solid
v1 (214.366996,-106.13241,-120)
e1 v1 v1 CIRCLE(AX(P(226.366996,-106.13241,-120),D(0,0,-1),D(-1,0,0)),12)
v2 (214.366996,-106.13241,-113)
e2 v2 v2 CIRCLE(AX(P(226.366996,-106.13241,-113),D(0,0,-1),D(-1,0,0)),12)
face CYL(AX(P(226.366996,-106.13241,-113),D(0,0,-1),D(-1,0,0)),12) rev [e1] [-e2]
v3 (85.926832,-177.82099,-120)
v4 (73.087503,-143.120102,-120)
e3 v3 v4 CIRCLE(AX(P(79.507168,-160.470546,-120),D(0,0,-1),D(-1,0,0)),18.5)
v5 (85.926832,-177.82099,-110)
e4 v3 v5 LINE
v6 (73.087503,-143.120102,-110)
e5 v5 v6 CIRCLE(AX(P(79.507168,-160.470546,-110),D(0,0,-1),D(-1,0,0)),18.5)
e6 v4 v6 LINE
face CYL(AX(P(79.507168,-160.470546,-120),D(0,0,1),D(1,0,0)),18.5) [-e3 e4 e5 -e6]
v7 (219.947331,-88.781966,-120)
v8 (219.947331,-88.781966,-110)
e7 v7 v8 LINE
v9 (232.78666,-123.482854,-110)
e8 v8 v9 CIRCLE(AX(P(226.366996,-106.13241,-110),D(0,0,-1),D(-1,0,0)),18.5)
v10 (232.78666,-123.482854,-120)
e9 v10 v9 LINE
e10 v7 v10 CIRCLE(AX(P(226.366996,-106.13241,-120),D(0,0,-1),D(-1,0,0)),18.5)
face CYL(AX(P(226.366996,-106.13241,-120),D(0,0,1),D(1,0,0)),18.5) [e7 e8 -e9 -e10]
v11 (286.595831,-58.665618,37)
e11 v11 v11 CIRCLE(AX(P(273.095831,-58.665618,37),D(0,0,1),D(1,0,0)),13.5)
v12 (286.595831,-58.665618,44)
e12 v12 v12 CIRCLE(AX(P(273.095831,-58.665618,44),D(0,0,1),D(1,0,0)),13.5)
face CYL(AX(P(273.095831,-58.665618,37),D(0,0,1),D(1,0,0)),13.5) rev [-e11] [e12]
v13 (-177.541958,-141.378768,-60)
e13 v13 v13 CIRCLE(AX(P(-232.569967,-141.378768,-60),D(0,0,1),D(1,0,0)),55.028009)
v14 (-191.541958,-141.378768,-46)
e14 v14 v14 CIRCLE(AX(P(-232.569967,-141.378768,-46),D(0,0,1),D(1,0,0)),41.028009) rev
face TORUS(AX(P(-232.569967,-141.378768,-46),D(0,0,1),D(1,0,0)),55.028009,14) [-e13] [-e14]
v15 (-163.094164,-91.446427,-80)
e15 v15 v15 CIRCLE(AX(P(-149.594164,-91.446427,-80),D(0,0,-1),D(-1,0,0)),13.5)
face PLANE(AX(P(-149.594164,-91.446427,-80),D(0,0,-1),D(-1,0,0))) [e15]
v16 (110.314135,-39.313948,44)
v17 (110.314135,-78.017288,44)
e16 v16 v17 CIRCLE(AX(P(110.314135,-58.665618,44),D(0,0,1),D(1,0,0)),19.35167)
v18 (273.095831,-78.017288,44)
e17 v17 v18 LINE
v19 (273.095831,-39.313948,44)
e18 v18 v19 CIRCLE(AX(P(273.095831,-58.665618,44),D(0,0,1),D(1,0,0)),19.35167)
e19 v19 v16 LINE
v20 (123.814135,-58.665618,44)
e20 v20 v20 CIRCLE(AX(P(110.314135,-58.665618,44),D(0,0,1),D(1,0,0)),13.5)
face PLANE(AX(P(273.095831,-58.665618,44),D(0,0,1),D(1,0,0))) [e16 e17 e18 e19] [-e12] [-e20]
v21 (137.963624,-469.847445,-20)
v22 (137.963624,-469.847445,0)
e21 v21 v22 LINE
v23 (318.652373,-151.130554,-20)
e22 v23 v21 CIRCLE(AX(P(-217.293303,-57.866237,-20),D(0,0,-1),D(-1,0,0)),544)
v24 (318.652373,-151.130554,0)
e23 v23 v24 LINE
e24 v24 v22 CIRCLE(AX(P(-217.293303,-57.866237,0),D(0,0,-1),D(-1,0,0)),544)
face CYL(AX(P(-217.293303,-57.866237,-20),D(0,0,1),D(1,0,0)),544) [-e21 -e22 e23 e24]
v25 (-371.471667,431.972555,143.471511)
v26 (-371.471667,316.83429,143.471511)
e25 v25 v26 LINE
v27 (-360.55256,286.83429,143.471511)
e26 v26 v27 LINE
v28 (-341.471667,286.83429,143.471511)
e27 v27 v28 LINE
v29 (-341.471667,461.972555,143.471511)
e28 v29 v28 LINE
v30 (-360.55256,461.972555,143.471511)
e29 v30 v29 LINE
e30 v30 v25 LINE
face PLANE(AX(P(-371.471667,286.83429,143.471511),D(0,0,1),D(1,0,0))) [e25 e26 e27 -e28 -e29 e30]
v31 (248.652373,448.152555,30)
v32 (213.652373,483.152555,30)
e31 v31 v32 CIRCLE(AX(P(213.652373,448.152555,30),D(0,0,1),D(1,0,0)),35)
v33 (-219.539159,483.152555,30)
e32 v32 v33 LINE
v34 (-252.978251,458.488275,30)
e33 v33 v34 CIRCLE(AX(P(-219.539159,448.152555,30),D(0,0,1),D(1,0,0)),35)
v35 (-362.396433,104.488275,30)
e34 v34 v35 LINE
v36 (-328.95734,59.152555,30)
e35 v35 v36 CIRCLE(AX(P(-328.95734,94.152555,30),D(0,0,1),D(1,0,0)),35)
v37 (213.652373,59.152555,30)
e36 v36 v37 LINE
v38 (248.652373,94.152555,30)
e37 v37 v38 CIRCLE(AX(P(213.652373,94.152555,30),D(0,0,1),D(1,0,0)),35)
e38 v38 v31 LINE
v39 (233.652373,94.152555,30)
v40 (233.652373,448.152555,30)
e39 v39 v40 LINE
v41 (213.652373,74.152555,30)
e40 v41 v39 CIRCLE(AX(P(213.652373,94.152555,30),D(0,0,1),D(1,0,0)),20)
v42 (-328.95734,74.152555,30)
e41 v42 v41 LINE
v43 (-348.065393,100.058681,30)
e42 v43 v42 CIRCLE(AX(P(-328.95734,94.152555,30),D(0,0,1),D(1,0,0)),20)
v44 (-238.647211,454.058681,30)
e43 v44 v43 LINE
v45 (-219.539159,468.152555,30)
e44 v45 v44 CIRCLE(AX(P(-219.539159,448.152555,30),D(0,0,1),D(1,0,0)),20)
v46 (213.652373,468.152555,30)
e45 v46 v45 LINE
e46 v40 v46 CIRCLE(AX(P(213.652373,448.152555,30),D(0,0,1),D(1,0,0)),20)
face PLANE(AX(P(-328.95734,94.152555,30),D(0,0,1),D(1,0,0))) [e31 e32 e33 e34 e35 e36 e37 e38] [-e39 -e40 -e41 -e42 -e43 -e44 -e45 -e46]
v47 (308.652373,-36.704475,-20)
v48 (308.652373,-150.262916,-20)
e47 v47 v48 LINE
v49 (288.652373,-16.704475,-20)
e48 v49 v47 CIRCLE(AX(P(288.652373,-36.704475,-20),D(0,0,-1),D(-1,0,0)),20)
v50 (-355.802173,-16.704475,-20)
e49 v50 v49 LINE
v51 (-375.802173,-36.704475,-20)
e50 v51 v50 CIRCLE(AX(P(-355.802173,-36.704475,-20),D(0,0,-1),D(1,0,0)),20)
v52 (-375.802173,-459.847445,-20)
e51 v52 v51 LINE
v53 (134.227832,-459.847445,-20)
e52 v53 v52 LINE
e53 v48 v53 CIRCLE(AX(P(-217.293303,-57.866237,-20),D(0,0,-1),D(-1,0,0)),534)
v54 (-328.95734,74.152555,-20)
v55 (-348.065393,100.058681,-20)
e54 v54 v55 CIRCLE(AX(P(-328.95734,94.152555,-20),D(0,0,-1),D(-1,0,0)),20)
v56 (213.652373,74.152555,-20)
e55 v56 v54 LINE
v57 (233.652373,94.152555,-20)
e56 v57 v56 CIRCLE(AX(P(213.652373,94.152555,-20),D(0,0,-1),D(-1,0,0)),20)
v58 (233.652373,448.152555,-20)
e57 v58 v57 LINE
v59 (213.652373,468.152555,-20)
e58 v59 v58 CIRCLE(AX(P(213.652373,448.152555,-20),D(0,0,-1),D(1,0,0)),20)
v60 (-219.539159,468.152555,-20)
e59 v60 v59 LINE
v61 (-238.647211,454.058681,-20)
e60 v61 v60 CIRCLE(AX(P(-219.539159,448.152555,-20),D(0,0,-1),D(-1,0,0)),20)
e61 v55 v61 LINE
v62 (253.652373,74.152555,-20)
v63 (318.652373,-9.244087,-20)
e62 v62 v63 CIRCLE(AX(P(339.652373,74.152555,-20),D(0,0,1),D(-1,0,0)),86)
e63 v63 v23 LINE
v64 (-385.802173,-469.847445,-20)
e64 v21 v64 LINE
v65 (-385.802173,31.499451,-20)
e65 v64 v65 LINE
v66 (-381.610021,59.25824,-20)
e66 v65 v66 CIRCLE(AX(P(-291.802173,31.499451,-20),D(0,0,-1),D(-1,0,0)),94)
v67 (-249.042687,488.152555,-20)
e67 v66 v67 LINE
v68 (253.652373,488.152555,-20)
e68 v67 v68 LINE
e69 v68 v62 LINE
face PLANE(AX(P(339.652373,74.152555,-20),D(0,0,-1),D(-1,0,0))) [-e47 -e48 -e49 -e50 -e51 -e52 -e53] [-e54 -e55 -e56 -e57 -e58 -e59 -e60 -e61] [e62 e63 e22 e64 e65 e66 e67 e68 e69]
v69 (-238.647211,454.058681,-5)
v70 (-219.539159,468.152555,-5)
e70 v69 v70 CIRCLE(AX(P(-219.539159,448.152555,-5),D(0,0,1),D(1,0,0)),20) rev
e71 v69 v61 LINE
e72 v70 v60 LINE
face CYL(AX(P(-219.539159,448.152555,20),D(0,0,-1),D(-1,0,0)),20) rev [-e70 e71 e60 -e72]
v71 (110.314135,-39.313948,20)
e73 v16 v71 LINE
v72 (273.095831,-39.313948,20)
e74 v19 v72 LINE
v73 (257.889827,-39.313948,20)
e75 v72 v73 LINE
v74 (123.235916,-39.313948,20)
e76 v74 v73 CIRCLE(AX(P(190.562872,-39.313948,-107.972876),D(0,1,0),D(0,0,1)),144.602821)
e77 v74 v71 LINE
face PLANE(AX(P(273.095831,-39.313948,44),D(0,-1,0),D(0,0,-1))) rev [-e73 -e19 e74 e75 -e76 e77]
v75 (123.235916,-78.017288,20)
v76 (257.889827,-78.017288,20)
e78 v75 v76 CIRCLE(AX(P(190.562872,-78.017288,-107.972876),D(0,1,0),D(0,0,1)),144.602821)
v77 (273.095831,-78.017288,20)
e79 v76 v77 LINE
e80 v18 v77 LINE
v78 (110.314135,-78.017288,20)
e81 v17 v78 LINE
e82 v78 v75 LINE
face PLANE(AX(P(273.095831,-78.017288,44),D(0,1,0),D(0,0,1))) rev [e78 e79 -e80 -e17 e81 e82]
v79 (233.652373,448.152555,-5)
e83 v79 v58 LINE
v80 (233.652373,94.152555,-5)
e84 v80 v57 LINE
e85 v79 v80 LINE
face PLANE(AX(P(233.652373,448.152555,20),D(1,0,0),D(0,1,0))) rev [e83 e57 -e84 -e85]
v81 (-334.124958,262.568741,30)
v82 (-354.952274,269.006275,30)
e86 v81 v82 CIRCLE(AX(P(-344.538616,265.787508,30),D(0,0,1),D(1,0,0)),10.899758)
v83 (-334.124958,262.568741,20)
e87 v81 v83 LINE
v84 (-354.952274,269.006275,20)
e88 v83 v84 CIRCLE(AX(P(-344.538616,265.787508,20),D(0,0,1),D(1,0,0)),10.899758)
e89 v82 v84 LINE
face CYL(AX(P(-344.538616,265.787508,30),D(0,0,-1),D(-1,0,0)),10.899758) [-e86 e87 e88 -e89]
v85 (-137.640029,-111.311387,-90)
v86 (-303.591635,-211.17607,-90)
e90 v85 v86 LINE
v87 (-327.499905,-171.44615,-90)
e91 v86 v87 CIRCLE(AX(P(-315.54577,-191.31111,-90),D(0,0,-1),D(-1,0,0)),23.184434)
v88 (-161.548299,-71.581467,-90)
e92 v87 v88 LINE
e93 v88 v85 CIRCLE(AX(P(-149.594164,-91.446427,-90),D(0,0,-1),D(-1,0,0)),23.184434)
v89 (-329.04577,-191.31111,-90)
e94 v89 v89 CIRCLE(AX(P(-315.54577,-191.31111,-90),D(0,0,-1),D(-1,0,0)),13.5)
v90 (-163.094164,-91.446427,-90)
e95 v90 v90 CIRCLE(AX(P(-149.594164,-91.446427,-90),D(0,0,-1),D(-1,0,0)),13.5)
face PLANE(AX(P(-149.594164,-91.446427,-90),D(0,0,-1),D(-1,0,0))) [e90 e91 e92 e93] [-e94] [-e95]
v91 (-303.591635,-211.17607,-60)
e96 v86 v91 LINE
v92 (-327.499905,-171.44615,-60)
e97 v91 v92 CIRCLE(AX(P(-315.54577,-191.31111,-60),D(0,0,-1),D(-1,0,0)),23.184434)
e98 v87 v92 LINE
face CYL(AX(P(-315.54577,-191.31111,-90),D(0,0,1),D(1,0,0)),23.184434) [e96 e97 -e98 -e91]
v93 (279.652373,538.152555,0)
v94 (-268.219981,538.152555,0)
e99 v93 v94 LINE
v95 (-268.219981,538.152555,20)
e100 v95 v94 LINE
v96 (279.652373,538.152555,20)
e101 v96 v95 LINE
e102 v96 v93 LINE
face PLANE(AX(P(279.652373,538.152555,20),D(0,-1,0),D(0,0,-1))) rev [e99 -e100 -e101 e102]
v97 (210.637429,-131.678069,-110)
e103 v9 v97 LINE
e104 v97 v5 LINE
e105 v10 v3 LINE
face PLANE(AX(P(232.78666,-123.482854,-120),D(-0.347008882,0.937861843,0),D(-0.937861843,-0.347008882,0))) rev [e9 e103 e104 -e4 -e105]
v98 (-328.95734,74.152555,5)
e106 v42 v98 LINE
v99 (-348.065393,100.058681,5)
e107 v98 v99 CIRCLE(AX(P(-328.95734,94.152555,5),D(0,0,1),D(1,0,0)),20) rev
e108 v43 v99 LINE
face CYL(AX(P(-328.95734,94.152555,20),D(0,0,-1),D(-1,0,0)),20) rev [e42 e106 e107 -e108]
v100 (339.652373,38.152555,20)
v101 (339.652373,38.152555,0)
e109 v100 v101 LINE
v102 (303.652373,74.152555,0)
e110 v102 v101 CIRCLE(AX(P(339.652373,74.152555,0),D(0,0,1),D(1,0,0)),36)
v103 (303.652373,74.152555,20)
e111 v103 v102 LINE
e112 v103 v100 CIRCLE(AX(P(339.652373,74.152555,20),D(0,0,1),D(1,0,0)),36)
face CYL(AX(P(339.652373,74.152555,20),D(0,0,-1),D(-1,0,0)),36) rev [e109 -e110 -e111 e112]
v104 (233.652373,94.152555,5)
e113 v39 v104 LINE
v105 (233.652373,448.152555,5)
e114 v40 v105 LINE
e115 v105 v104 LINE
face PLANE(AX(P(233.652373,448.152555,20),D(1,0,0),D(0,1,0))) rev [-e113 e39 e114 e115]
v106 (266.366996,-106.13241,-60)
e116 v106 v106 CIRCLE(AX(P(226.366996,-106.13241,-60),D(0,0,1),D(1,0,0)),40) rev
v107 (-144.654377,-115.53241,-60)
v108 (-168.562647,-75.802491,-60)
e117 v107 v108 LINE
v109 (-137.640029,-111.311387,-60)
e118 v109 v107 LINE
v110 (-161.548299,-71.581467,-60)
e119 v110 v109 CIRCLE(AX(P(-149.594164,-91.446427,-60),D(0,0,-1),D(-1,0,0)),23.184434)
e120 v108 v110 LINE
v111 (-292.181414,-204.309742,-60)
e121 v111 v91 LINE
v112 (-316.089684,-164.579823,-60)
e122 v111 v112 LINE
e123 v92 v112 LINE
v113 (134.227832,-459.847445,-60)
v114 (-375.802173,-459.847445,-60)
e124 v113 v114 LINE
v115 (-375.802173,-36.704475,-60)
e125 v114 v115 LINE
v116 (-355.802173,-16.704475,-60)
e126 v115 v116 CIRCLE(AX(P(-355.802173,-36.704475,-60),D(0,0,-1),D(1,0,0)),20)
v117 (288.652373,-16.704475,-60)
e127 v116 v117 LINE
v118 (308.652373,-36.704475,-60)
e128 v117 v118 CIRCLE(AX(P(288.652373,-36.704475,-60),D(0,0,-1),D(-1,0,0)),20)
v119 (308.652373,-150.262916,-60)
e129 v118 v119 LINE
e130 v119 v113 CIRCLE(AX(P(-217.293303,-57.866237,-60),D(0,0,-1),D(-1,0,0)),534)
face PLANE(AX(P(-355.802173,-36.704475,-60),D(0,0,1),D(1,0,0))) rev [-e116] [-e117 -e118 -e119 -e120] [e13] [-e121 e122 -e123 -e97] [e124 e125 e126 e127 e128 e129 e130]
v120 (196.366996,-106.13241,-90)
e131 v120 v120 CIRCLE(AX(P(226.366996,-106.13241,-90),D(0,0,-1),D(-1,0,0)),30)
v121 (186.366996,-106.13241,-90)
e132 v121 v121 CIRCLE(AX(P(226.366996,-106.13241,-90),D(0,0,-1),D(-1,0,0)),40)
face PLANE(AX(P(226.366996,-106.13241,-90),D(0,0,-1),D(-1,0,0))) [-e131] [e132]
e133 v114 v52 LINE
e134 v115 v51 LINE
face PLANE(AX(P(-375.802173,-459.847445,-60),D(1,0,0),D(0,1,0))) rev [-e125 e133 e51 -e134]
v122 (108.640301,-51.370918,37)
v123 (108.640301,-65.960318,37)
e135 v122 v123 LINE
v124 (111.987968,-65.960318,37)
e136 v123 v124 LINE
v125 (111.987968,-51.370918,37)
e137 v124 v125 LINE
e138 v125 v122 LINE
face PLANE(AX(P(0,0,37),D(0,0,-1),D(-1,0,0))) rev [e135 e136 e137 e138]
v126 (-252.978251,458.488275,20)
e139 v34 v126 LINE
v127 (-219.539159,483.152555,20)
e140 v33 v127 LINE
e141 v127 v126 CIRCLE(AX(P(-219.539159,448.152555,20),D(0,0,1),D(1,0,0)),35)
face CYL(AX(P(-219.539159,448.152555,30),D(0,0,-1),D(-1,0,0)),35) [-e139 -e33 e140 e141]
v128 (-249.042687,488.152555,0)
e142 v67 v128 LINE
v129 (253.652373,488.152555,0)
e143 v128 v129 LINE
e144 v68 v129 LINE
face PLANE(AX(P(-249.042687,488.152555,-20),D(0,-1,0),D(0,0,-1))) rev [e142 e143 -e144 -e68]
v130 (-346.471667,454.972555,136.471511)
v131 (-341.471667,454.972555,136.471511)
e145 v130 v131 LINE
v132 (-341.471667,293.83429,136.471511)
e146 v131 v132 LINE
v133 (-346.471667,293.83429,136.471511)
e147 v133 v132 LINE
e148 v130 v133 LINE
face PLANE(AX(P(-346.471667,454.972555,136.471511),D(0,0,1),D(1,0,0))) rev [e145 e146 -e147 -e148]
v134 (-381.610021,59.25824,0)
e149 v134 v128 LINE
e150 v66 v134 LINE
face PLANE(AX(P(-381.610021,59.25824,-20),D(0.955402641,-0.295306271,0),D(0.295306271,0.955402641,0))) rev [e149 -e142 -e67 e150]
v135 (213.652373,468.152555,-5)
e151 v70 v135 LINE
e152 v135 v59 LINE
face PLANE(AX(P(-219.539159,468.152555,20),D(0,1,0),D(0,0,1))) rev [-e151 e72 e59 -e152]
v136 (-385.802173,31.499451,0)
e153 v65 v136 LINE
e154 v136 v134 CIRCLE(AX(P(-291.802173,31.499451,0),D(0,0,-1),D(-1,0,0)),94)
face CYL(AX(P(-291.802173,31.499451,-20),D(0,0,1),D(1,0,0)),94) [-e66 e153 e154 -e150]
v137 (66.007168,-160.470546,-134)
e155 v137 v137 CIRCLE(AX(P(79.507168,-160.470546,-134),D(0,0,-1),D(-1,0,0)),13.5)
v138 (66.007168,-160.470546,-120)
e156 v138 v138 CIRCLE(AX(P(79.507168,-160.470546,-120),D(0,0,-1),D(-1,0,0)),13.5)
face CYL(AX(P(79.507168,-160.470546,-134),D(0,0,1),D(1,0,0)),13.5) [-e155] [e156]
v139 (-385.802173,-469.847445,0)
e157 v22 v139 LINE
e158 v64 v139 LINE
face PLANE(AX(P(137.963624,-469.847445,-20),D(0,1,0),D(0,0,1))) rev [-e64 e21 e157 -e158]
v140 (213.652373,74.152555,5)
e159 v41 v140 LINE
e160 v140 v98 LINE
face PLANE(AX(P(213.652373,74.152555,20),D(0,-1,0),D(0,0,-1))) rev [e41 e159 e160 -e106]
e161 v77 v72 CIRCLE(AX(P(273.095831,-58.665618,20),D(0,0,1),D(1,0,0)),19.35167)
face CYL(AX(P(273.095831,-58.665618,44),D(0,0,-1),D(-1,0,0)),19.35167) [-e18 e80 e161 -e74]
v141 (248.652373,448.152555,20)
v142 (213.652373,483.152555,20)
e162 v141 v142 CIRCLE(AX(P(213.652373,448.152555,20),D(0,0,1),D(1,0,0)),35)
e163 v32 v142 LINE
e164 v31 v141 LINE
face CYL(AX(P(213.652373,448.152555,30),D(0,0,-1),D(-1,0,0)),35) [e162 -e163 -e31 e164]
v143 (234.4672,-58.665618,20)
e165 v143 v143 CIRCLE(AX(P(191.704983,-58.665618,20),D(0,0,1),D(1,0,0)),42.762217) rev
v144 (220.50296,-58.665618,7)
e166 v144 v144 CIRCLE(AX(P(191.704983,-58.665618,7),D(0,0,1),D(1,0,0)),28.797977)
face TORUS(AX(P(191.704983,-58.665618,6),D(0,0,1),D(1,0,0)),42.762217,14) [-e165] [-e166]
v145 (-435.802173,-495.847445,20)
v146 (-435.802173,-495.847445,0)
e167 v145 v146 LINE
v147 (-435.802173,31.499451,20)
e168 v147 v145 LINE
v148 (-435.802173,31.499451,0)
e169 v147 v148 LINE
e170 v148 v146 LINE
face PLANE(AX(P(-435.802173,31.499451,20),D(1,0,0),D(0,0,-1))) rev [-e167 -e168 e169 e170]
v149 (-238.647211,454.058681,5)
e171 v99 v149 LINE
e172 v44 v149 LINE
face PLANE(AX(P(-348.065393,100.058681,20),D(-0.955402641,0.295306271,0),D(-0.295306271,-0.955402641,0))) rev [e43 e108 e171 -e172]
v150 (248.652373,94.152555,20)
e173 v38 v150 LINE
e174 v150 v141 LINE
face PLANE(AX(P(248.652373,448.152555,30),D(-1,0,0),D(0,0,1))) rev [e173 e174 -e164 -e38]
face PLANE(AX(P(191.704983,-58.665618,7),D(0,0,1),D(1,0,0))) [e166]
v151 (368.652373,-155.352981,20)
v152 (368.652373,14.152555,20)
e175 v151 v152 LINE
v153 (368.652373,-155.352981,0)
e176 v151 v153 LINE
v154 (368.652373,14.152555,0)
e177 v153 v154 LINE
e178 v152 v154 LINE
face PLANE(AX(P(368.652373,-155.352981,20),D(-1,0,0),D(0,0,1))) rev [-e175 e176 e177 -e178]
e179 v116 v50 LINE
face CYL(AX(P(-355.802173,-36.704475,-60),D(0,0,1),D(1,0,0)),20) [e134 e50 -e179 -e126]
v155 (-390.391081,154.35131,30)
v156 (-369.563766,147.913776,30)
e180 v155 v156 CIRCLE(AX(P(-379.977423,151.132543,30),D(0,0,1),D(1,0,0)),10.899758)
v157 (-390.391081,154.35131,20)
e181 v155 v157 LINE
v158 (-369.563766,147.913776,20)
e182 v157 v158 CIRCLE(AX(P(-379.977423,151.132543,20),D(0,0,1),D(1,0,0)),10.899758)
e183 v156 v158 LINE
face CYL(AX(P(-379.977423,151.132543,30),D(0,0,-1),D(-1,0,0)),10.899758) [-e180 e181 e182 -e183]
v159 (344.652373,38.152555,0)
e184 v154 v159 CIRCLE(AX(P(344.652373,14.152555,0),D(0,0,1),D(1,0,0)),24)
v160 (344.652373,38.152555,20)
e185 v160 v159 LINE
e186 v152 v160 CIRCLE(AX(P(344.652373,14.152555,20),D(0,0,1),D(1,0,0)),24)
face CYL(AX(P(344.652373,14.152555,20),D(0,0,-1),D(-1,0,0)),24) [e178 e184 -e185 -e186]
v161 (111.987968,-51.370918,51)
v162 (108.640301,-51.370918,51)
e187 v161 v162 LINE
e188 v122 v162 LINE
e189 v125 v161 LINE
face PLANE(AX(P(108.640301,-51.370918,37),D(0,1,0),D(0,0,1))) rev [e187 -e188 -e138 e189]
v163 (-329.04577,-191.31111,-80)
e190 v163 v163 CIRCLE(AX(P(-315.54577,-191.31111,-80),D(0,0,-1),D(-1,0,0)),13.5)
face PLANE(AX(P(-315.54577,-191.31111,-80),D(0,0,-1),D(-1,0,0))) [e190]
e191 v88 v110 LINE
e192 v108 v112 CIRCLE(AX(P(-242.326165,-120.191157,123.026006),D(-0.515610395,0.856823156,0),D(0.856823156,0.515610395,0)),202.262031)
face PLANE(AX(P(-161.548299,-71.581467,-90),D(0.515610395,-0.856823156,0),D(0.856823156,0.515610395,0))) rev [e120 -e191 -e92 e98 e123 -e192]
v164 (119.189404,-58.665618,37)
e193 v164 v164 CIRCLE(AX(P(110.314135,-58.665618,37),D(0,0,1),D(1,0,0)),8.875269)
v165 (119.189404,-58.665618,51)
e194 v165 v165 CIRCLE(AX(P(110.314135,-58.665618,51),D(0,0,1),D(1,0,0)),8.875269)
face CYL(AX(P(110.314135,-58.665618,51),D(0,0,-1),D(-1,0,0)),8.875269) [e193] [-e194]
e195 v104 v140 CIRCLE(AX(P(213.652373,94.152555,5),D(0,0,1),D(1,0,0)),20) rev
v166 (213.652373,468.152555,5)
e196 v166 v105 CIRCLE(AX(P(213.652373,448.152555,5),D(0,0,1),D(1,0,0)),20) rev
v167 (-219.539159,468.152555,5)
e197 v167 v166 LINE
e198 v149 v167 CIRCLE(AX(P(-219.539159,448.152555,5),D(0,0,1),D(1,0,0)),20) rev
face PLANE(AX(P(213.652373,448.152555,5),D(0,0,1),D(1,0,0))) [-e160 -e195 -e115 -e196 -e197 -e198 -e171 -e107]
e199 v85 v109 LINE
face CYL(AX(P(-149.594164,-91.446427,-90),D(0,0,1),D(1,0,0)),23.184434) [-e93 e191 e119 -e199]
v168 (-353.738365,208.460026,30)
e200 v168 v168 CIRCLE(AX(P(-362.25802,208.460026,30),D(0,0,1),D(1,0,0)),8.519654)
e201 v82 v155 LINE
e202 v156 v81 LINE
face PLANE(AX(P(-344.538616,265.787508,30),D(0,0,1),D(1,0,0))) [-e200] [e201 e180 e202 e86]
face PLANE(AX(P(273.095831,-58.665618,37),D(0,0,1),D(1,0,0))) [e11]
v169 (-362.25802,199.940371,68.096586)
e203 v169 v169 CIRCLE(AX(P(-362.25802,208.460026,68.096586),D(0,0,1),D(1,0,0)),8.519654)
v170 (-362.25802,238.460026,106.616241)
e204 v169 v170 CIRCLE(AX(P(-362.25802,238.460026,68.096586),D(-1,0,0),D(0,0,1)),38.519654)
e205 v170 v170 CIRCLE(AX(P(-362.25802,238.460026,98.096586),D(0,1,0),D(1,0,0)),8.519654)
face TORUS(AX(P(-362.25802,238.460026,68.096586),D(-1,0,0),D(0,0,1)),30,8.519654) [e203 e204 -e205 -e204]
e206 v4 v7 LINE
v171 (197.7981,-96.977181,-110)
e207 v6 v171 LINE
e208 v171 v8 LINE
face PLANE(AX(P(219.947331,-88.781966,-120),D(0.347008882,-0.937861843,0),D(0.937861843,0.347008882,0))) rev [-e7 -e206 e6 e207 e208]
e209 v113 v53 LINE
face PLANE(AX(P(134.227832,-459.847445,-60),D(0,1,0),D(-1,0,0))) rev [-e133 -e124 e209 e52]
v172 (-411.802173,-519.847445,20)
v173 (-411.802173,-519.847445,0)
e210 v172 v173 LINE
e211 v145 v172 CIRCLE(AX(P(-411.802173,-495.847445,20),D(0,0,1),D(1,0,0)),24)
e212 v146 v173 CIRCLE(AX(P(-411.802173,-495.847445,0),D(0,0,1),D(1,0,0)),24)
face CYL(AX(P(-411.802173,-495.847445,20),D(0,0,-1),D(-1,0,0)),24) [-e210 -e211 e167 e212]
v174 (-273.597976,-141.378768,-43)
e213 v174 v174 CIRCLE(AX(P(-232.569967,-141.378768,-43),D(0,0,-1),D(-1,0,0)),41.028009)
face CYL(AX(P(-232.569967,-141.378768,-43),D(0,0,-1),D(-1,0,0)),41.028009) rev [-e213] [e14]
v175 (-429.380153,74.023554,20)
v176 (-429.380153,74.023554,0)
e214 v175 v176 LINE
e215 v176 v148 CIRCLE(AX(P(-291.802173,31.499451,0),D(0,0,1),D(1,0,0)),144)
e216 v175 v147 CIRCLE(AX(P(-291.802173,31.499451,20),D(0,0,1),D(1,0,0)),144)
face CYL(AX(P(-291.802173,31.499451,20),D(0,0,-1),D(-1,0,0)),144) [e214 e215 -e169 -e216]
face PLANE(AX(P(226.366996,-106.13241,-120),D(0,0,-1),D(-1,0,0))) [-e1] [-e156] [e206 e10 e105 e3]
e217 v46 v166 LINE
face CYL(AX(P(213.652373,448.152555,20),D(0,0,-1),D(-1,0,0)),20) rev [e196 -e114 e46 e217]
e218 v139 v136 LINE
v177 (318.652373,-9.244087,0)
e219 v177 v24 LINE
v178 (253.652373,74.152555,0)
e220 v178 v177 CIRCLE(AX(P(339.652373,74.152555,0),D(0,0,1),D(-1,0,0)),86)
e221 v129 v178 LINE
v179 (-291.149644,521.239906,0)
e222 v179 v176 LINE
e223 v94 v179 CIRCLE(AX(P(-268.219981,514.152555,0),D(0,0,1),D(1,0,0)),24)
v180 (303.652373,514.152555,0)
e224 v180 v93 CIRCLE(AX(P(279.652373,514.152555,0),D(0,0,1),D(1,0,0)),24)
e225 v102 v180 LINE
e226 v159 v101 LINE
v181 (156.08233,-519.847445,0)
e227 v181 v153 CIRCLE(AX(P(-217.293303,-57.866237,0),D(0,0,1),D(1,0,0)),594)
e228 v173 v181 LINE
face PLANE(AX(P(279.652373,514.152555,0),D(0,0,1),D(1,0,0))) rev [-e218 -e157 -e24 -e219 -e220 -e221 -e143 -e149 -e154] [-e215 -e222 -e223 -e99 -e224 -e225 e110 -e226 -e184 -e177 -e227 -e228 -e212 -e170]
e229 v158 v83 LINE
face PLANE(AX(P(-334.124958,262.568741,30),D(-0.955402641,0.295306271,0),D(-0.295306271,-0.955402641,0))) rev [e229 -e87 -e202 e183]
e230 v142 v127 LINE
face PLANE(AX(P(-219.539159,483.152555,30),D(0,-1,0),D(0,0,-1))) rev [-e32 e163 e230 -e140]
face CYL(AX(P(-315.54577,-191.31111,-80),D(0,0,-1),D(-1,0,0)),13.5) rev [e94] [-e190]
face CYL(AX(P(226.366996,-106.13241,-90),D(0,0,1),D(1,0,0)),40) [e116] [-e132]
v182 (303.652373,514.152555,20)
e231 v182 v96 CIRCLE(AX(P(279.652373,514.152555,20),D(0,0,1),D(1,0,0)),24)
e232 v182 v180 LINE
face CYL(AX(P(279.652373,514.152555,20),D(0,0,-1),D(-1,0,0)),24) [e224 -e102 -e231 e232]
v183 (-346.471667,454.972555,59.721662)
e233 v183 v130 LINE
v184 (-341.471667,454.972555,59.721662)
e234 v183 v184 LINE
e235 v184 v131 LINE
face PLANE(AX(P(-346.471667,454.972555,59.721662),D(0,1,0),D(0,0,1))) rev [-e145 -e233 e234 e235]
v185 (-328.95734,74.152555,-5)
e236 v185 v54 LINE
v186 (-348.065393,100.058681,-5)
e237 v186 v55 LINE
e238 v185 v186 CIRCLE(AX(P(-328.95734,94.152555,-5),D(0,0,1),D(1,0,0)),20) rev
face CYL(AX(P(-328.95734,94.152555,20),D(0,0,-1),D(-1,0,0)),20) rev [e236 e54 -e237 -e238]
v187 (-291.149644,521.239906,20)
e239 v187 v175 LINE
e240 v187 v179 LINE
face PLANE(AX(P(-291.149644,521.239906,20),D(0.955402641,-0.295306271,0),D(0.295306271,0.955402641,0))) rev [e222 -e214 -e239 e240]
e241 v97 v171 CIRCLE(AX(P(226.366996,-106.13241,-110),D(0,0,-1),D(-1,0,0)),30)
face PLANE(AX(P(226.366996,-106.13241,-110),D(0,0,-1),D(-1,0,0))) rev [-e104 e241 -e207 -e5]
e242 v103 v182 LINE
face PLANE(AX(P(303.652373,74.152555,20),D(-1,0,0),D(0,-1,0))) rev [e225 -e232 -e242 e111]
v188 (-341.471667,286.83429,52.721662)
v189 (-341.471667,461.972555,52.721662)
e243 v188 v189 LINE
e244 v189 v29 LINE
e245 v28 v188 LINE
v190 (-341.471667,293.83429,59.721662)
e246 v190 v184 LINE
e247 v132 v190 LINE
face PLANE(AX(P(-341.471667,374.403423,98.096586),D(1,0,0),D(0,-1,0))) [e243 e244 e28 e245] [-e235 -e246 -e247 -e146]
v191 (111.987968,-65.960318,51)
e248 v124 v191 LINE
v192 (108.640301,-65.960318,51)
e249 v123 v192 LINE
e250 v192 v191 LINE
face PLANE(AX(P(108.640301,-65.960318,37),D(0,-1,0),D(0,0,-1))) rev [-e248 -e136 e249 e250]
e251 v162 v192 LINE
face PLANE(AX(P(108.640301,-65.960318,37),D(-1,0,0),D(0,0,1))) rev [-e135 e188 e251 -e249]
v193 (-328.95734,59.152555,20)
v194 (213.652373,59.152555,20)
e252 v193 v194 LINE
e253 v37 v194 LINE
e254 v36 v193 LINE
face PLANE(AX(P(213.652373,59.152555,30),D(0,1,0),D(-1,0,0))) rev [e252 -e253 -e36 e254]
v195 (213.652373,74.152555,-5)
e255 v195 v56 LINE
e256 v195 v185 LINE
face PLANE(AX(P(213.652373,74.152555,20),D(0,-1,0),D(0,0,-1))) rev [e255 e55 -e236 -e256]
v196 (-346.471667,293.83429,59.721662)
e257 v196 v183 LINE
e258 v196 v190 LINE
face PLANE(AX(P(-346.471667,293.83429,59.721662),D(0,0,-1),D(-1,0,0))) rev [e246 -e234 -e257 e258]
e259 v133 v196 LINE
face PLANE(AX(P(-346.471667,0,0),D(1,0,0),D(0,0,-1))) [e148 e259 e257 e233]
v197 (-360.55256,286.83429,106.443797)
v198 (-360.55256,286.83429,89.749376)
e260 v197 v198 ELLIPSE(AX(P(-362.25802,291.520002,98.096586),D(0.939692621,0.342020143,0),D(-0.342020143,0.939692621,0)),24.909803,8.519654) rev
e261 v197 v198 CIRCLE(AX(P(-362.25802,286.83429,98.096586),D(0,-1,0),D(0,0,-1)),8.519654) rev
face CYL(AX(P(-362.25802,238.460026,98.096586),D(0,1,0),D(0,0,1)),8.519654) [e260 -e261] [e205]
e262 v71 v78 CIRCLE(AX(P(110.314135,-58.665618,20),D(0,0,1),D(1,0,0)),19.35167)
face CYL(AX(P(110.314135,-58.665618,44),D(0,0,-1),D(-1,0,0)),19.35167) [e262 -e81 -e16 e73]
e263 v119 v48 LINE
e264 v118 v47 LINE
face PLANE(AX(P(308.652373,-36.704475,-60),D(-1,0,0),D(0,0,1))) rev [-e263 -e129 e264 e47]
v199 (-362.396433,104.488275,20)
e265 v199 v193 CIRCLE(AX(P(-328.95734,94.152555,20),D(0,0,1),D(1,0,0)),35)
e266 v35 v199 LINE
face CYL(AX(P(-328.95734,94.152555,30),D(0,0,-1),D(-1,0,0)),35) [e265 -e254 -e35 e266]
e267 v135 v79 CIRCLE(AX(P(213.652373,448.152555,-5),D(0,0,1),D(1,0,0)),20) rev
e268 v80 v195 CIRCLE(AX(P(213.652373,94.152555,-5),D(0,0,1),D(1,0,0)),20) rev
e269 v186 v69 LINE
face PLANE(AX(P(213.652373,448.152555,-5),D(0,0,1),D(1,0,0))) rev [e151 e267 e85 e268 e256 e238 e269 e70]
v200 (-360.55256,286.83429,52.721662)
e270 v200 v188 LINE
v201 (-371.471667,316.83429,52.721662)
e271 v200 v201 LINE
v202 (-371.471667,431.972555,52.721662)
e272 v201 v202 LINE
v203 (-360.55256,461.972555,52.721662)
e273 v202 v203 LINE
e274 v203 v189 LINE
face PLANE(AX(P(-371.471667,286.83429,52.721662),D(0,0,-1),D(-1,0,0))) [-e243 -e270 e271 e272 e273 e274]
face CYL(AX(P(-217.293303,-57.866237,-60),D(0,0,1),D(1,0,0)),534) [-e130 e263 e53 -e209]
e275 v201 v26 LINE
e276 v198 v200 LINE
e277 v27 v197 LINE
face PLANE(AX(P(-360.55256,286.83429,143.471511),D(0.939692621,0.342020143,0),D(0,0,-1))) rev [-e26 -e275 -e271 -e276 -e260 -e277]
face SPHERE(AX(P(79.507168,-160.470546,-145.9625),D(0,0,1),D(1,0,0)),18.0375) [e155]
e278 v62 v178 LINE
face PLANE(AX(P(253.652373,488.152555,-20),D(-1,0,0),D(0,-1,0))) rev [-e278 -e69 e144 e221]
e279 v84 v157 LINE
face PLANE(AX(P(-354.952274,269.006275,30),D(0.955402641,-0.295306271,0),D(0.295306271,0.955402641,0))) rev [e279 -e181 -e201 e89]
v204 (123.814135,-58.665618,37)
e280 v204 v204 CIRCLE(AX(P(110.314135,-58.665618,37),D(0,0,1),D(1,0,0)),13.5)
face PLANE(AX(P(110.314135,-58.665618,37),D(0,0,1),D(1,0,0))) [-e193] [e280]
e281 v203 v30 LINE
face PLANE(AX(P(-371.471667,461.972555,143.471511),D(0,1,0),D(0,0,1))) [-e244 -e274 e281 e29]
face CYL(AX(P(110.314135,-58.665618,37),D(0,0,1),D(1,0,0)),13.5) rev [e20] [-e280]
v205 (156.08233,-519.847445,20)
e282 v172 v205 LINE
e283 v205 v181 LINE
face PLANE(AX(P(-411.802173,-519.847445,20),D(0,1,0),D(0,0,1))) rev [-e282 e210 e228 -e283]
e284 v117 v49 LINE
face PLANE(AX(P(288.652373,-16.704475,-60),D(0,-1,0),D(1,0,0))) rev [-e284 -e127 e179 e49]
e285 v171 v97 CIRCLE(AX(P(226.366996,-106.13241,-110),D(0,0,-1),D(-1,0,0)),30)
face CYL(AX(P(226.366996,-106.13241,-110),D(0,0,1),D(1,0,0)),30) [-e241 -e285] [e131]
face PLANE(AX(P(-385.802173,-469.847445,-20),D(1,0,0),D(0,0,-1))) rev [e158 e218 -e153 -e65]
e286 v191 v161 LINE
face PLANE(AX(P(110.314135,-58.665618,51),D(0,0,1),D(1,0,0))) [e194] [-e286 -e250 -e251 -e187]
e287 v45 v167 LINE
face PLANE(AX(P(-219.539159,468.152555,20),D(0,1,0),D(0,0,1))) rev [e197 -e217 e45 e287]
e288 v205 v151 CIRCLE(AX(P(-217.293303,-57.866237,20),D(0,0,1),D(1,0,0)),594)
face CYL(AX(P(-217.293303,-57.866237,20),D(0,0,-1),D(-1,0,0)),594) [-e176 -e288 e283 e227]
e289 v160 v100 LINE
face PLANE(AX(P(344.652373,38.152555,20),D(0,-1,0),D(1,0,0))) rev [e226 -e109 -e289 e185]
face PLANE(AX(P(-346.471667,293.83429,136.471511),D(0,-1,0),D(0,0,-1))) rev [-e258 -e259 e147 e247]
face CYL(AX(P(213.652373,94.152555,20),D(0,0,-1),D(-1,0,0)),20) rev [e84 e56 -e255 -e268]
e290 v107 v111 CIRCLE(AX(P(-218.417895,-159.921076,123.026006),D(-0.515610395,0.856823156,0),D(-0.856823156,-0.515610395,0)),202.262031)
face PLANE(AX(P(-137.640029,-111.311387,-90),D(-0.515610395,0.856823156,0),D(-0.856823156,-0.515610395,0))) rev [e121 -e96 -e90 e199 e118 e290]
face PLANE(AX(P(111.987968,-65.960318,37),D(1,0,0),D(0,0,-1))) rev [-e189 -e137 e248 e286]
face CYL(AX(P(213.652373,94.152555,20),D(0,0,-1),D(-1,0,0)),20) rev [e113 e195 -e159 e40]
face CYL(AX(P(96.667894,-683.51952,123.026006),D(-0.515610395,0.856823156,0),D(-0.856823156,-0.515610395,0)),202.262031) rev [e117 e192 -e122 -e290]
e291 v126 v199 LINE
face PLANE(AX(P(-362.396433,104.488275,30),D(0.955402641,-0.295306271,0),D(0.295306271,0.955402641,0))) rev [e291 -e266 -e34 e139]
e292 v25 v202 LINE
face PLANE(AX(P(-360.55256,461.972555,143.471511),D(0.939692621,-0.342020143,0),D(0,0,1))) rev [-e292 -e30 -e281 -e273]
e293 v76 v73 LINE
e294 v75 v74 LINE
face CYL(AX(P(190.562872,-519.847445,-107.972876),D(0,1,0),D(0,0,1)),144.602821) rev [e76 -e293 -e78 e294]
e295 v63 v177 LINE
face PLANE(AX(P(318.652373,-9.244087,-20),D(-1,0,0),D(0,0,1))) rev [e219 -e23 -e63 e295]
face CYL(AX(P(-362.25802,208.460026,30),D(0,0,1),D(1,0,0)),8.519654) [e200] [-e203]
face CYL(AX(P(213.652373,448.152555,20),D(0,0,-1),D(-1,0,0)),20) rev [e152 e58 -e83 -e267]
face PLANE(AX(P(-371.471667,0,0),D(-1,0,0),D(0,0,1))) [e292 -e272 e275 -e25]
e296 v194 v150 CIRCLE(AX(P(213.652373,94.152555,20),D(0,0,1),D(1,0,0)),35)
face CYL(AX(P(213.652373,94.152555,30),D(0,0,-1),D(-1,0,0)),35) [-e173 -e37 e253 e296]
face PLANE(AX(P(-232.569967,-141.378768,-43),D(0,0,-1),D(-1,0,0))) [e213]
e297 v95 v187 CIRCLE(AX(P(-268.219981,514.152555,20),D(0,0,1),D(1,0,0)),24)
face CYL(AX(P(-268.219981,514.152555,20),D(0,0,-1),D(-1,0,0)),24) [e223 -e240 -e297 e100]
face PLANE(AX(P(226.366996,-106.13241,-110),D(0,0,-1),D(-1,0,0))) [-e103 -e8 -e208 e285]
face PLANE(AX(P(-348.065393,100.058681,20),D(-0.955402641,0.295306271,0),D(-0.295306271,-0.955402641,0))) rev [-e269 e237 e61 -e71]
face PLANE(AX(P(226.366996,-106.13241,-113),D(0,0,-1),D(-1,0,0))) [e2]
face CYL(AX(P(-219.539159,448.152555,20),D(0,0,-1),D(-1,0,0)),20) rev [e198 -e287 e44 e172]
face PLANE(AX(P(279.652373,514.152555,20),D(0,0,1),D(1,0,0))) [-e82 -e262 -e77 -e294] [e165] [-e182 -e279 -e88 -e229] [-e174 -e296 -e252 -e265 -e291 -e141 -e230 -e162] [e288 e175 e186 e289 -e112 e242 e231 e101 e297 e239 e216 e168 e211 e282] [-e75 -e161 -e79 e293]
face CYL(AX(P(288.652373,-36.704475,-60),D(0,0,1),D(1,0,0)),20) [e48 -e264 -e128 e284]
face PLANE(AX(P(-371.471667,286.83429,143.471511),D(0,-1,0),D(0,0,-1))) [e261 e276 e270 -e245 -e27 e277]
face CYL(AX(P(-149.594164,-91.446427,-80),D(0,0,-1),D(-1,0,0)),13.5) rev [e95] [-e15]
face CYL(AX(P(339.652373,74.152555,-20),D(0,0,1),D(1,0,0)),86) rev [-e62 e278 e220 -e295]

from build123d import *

# Parameters (mm, degrees)
BOSS_EXTRUDE1_DEPTH  = 20
BOSS_EXTRUDE2_DEPTH  = 20
BOSS_EXTRUDE3_DEPTH  = 40
CUT_EXTRUDE1_DEPTH   = 694.636580883
SKETCH5_R            = 40
BOSS_EXTRUDE4_DEPTH  = 30
SKETCH6_R            = 30
BOSS_EXTRUDE5_DEPTH  = 20
BOSS_EXTRUDE6_DEPTH  = 10
SKETCH8_R            = 13.5
BOSS_EXTRUDE7_DEPTH  = 14
DOME1_FACE_RADIUS    = 13.5
DOME1_HEIGHT         = 30
SKETCH9_R            = 12
CUT_EXTRUDE2_DEPTH   = 7
BOSS_EXTRUDE8_DEPTH  = 30
CUT_EXTRUDE3_DEPTH   = 706.151386516
SKETCH12_R           = 13.5
CUT_EXTRUDE4_DEPTH   = 10
BOSS_EXTRUDE9_DEPTH  = 10
BOSS_EXTRUDE10_DEPTH = 24
SKETCH15_R           = 28.797977261
CUT_EXTRUDE5_DEPTH   = 13
CUT_EXTRUDE6_DEPTH   = 742.81338331
SKETCH17_R           = 13.5
CUT_EXTRUDE7_DEPTH   = 7
SKETCH18_R           = 8.875268811
BOSS_EXTRUDE11_DEPTH = 14
SKETCH19_W           = 3.347666912
SKETCH19_H           = 14.589400007
CUT_EXTRUDE8_DEPTH   = 14
FILLET1_R            = 14
SKETCH20_R           = 41.028008726
CUT_EXTRUDE9_DEPTH   = 17
FILLET2_R            = 14
BOSS_EXTRUDE12_DEPTH = 10
SKETCH26_R           = 8.519654293
SKETCH29_W           = 90.749848766
SKETCH29_H           = 175.138264735
BOSS_EXTRUDE13_DEPTH = 30
CHAMFER1_SIZE        = 10.919107028
CHAMFER1_SIZE_2      = 30
SKETCH30_W           = 76.749848766
SKETCH30_H           = 161.138264735
CUT_EXTRUDE10_DEPTH  = 5
BOSS_EXTRUDE14_DEPTH = 5


with BuildPart() as part:
    # Sketch1 → Boss-Extrude1 (new body)
    with BuildSketch(Plane.XY):
        with BuildLine():
            Line((-435.802172671, 31.499450535), (-435.802172671, -495.847444832))
            ThreePointArc((-435.802172671, -495.847444832), (-428.772735419, -512.81800758), (-411.802172671, -519.847444832))
            Line((-411.802172671, -519.847444832), (156.082330181, -519.847444832))
            ThreePointArc((156.082330181, -519.847444832), (295.823055216, -357.111291989), (368.652372784, -155.352980691))
            Line((368.652372784, -155.352980691), (368.652372784, 14.152555168))
            ThreePointArc((368.652372784, 14.152555168), (361.622935532, 31.123117917), (344.652372784, 38.152555168))
            Line((344.652372784, 38.152555168), (339.652372784, 38.152555168))
            ThreePointArc((339.652372784, 38.152555168), (314.196528661, 48.696711046), (303.652372784, 74.152555168))
            Line((303.652372784, 74.152555168), (303.652372784, 514.152555168))
            ThreePointArc((303.652372784, 514.152555168), (296.622935532, 531.123117917), (279.652372784, 538.152555168))
            Line((279.652372784, 538.152555168), (-268.219980748, 538.152555168))
            ThreePointArc((-268.219980748, 538.152555168), (-282.466095797, 533.46701105), (-291.149644132, 521.239905669))
            Line((-291.149644132, 521.239905669), (-429.380152972, 74.023553537))
            ThreePointArc((-429.380152972, 74.023553537), (-434.187616385, 53.002599567), (-435.802172671, 31.499450535))
        make_face()
    extrude(amount=BOSS_EXTRUDE1_DEPTH)

    # Sketch2 → Boss-Extrude2 (add)
    with BuildSketch(Plane(origin=(0, 0, 0), x_dir=(-1, 0, 0), z_dir=(0, 0, -1))):
        with BuildLine():
            Line((-253.652372784, 488.152555168), (-253.652372784, 74.152555168))
            ThreePointArc((-253.652372784, 74.152555168), (-271.821701255, 21.284795617), (-318.652372784, -9.24408745))
            Line((-318.652372784, -9.24408745), (-318.652372784, -151.130553633))
            ThreePointArc((-318.652372784, -151.130553633), (-255.946207235, -326.157805935), (-137.963624113, -469.847444832))
            Line((-137.963624113, -469.847444832), (385.802172671, -469.847444832))
            Line((385.802172671, -469.847444832), (385.802172671, 31.499450535))
            ThreePointArc((385.802172671, 31.499450535), (384.748226206, 45.536228375), (381.610020923, 59.258239994))
            Line((381.610020923, 59.258239994), (249.042687142, 488.152555168))
            Line((249.042687142, 488.152555168), (-253.652372784, 488.152555168))
        make_face()
    extrude(amount=BOSS_EXTRUDE2_DEPTH)

    # Sketch3 → Boss-Extrude3 (add)
    with BuildSketch(Plane(origin=(0, 0, -20), x_dir=(-1, 0, 0), z_dir=(0, 0, -1))):
        with BuildLine():
            Line((-288.652372784, -16.70447538), (355.802172671, -16.70447538))
            ThreePointArc((355.802172671, -16.70447538), (369.944308295, -22.562339756), (375.802172671, -36.70447538))
            Line((375.802172671, -36.70447538), (375.802172671, -459.847444832))
            Line((375.802172671, -459.847444832), (-134.227832102, -459.847444832))
            ThreePointArc((-134.227832102, -459.847444832), (-247.946039922, -319.989020839), (-308.652372784, -150.262915887))
            Line((-308.652372784, -150.262915887), (-308.652372784, -36.70447538))
            ThreePointArc((-308.652372784, -36.70447538), (-302.794508408, -22.562339756), (-288.652372784, -16.70447538))
        make_face()
    extrude(amount=BOSS_EXTRUDE3_DEPTH)

    # Sketch4 → Cut-Extrude1 (cut, through all)
    with BuildSketch(Plane(origin=(0, 0, -20), x_dir=(-1, 0, 0), z_dir=(0, 0, -1))):
        with BuildLine():
            Line((-213.652372784, 74.152555168), (328.957340336, 74.152555168))
            ThreePointArc((328.957340336, 74.152555168), (345.052720237, 82.280792627), (348.065393156, 100.058680585))
            Line((348.065393156, 100.058680585), (238.647211337, 454.058680585))
            ThreePointArc((238.647211337, 454.058680585), (231.410921059, 464.24793507), (219.539158518, 468.152555168))
            Line((219.539158518, 468.152555168), (-213.652372784, 468.152555168))
            ThreePointArc((-213.652372784, 468.152555168), (-227.794508408, 462.294690792), (-233.652372784, 448.152555168))
            Line((-233.652372784, 448.152555168), (-233.652372784, 94.152555168))
            ThreePointArc((-233.652372784, 94.152555168), (-227.794508408, 80.010419545), (-213.652372784, 74.152555168))
        make_face()
    extrude(amount=-CUT_EXTRUDE1_DEPTH, mode=Mode.SUBTRACT)

    # Sketch5 → Boss-Extrude4 (add)
    with BuildSketch(Plane(origin=(0, 0, -60), x_dir=(-1, 0, 0), z_dir=(0, 0, -1))):
        with Locations(Location((-226.366995514, -106.132409766, 0), (0, 0, 180))):
            Circle(SKETCH5_R)
    extrude(amount=BOSS_EXTRUDE4_DEPTH)

    # Sketch6 → Boss-Extrude5 (add)
    with BuildSketch(Plane(origin=(0, 0, -90), x_dir=(-1, 0, 0), z_dir=(0, 0, -1))):
        with Locations((-226.366995514, -106.132409766)):
            Circle(SKETCH6_R)
    extrude(amount=BOSS_EXTRUDE5_DEPTH)

    # Sketch7 → Boss-Extrude6 (add)
    with BuildSketch(Plane(origin=(0, 0, -110), x_dir=(-1, 0, 0), z_dir=(0, 0, -1))):
        with BuildLine():
            Line((-219.947331201, -88.781965676), (-73.087503259, -143.120102015))
            ThreePointArc((-73.087503259, -143.120102015), (-62.156723482, -166.890210418), (-85.926831885, -177.820990194))
            Line((-85.926831885, -177.820990194), (-232.786659827, -123.482853856))
            ThreePointArc((-232.786659827, -123.482853856), (-243.717439603, -99.712745453), (-219.947331201, -88.781965676))
        make_face()
    extrude(amount=BOSS_EXTRUDE6_DEPTH)

    # Sketch8 → Boss-Extrude7 (add)
    with BuildSketch(Plane(origin=(0, 0, -120), x_dir=(-1, 0, 0), z_dir=(0, 0, -1))):
        with Locations((-79.507167572, -160.470546105)):
            Circle(SKETCH8_R)
    extrude(amount=BOSS_EXTRUDE7_DEPTH)

    # Dome1: a dome of height H over a round flat face of radius A is a cap of a sphere of radius (A * A + H * H) / (2 * H)
    dome1_r = (DOME1_FACE_RADIUS * DOME1_FACE_RADIUS + DOME1_HEIGHT * DOME1_HEIGHT) / (2 * DOME1_HEIGHT)
    dome1_base = Plane((79.507167572, -160.470546105, -134), z_dir=(0, 0, -1))
    with Locations(dome1_base.offset(DOME1_HEIGHT - dome1_r)):
        dome1_ball = Sphere(dome1_r, mode=Mode.PRIVATE)
    add(split(dome1_ball, bisect_by=dome1_base, keep=Keep.TOP, mode=Mode.PRIVATE))

    # Sketch9 → Cut-Extrude2 (cut)
    with BuildSketch(Plane(origin=(0, 0, -120), x_dir=(-1, 0, 0), z_dir=(0, 0, -1))):
        with Locations((-226.366995514, -106.132409766)):
            Circle(SKETCH9_R)
    extrude(amount=-CUT_EXTRUDE2_DEPTH, mode=Mode.SUBTRACT)

    # Sketch10 → Boss-Extrude8 (add)
    with BuildSketch(Plane(origin=(0, 0, -60), x_dir=(-1, 0, 0), z_dir=(0, 0, -1))):
        with BuildLine():
            Line((161.548299015, -71.581467344), (327.499904589, -171.446150345))
            ThreePointArc((327.499904589, -171.446150345), (335.41072922, -203.26524497), (303.591634595, -211.1760696))
            Line((303.591634595, -211.1760696), (137.64002902, -111.3113866))
            ThreePointArc((137.64002902, -111.3113866), (129.72920439, -79.492291975), (161.548299015, -71.581467344))
        make_face()
    extrude(amount=BOSS_EXTRUDE8_DEPTH)

    # Sketch11 → Cut-Extrude3 (cut, through all)
    with BuildSketch(Plane(origin=(-11.324517885, 18.818684132, 0), x_dir=(0.8568231560670643, 0.515610394801419, 0), z_dir=(-0.515610394801419, 0.8568231560670643, 0))):
        with BuildLine():
            Line((-355.692027555, 60), (-183.512931338, 60))
            ThreePointArc((-183.512931338, 60), (-269.602479447, 79.236024987), (-355.692027555, 60))
        make_face()
    extrude(amount=-CUT_EXTRUDE3_DEPTH, mode=Mode.SUBTRACT)

    # Sketch12 → Cut-Extrude4 (cut)
    with BuildSketch(Plane(origin=(0, 0, -90), x_dir=(-1, 0, 0), z_dir=(0, 0, -1))):
        with Locations((149.594164018, -91.446426972)):
            Circle(SKETCH12_R)
        with Locations((315.545769592, -191.311109972)):
            Circle(SKETCH12_R)
    extrude(amount=-CUT_EXTRUDE4_DEPTH, mode=Mode.SUBTRACT)

    # Sketch13 → Boss-Extrude9 (add)
    with BuildSketch(Plane.XY.offset(20)):
        with BuildLine():
            Line((-362.39643277, 104.488274648), (-252.978250952, 458.488274648))
            ThreePointArc((-252.978250952, 458.488274648), (-240.314742965, 476.319469996), (-219.539158518, 483.152555168))
            Line((-219.539158518, 483.152555168), (213.652372784, 483.152555168))
            ThreePointArc((213.652372784, 483.152555168), (238.401110125, 472.90129251), (248.652372784, 448.152555168))
            Line((248.652372784, 448.152555168), (248.652372784, 94.152555168))
            ThreePointArc((248.652372784, 94.152555168), (238.401110125, 69.403817827), (213.652372784, 59.152555168))
            Line((213.652372784, 59.152555168), (-328.957340336, 59.152555168))
            ThreePointArc((-328.957340336, 59.152555168), (-357.124255163, 73.376970722), (-362.39643277, 104.488274648))
        make_face()
        with BuildLine():
            Line((213.652372784, 74.152555168), (-328.957340336, 74.152555168))
            ThreePointArc((-328.957340336, 74.152555168), (-345.052720237, 82.280792627), (-348.065393156, 100.058680585))
            Line((-348.065393156, 100.058680585), (-238.647211337, 454.058680585))
            ThreePointArc((-238.647211337, 454.058680585), (-231.410921059, 464.24793507), (-219.539158518, 468.152555168))
            Line((-219.539158518, 468.152555168), (213.652372784, 468.152555168))
            ThreePointArc((213.652372784, 468.152555168), (227.794508408, 462.294690792), (233.652372784, 448.152555168))
            Line((233.652372784, 448.152555168), (233.652372784, 94.152555168))
            ThreePointArc((233.652372784, 94.152555168), (227.794508408, 80.010419545), (213.652372784, 74.152555168))
        make_face(mode=Mode.SUBTRACT)
    extrude(amount=BOSS_EXTRUDE9_DEPTH)

    # Sketch14 → Boss-Extrude10 (add)
    with BuildSketch(Plane.XY.offset(20)):
        with BuildLine():
            Line((273.095830693, -78.017287965), (110.314134939, -78.017287965))
            ThreePointArc((110.314134939, -78.017287965), (90.962464814, -58.66561784), (110.314134939, -39.313947716))
            Line((110.314134939, -39.313947716), (273.095830693, -39.313947716))
            ThreePointArc((273.095830693, -39.313947716), (292.447500817, -58.66561784), (273.095830693, -78.017287965))
        make_face()
    extrude(amount=BOSS_EXTRUDE10_DEPTH)

    # Sketch15 → Cut-Extrude5 (cut)
    with BuildSketch(Plane.XY.offset(20)):
        with Locations((191.704982816, -58.66561784)):
            Circle(SKETCH15_R)
    extrude(amount=-CUT_EXTRUDE5_DEPTH, mode=Mode.SUBTRACT)

    # Sketch16 → Cut-Extrude6 (cut, through all)
    with BuildSketch(Plane(origin=(0, -39.313947716, 0), x_dir=(1, 0, 0), z_dir=(0, 1, 0))):
        with BuildLine():
            Line((123.235916311, -20), (257.889827344, -20))
            ThreePointArc((257.889827344, -20), (190.562871827, -36.629945292), (123.235916311, -20))
        make_face()
    extrude(amount=-CUT_EXTRUDE6_DEPTH, mode=Mode.SUBTRACT)

    # Sketch17 → Cut-Extrude7 (cut)
    with BuildSketch(Plane.XY.offset(44)):
        with Locations((110.314134939, -58.66561784)):
            Circle(SKETCH17_R)
        with Locations((273.095830693, -58.66561784)):
            Circle(SKETCH17_R)
    extrude(amount=-CUT_EXTRUDE7_DEPTH, mode=Mode.SUBTRACT)

    # Sketch18 → Boss-Extrude11 (add)
    with BuildSketch(Plane.XY.offset(37)):
        with Locations((110.314134939, -58.66561784)):
            Circle(SKETCH18_R)
    extrude(amount=BOSS_EXTRUDE11_DEPTH)

    # Sketch19 → Cut-Extrude8 (cut)
    with BuildSketch(Plane.XY.offset(51)):
        with Locations((110.314134939, -58.665617841)):
            Rectangle(SKETCH19_W, SKETCH19_H)
    extrude(amount=-CUT_EXTRUDE8_DEPTH, mode=Mode.SUBTRACT)

    # Fillet1
    # the kernel refuses this fillet: 14 mm, written as the material it takes off along each edge
    with BuildSketch(Plane(origin=(191.704982816, -58.66561784, 20), x_dir=(1, 0, 0), z_dir=(0, 1, 0))) as fillet1_piece_1:
        with BuildLine():
            CenterArc((42.762217304, 14), FILLET1_R, 184.096043758, 85.903956242)
            Line((28.797977261, 13), (28.51869246, 12.98))
            ThreePointArc((28.51869246, 12.98), (28.517977261, 6.5), (28.517977261, 0))
            Line((28.517977261, 0), (28.797977261, -0.28))
            Line((28.797977261, -0.28), (42.762217304, -0.28))
            Line((42.762217304, -0.28), (42.762217304, 0))
        make_face()
    revolve(axis=Axis((191.704982816, -58.66561784, 20), (0, 0, -1)), mode=Mode.SUBTRACT)

    # Sketch20 → Cut-Extrude9 (cut)
    with BuildSketch(Plane(origin=(0, 0, -60), x_dir=(-1, 0, 0), z_dir=(0, 0, -1))):
        with Locations((232.569966805, -141.378768472)):
            Circle(SKETCH20_R)
    extrude(amount=-CUT_EXTRUDE9_DEPTH, mode=Mode.SUBTRACT)

    # Fillet2
    fillet2_edges = [part.edges().sort_by_distance(p)[0] for p in [
        (-191.541958079, -141.378768472, -60),
    ]]
    fillet(fillet2_edges, radius=FILLET2_R)

    # Sketch21 → Boss-Extrude12 (add)
    with BuildSketch(Plane.XY.offset(20)):
        with BuildLine():
            Line((-334.124958182, 262.568741263), (-369.563765553, 147.913776237))
            ThreePointArc((-369.563765553, 147.913776237), (-383.196190209, 140.718885446), (-390.391080999, 154.351310101))
            Line((-390.391080999, 154.351310101), (-354.952273627, 269.006275128))
            ThreePointArc((-354.952273627, 269.006275128), (-341.319848972, 276.201165918), (-334.124958182, 262.568741263))
        make_face()
    extrude(amount=BOSS_EXTRUDE12_DEPTH)

    # Sweep1: sweep along a curve in space
    with BuildLine() as sweep1_path:
        Line((-362.25801959, 208.460025682, 30), (-362.25801959, 208.460025682, 68.096586479))
        ThreePointArc((-362.25801959, 208.460025682, 68.096586479), (-362.25801959, 217.246822247, 89.309789915), (-362.25801959, 238.460025682, 98.096586479))
        Line((-362.25801959, 238.460025682, 98.096586479), (-362.25801959, 354.403422549, 98.096586479))
        ThreePointArc((-362.25801959, 354.403422549, 98.096586479), (-356.400155214, 368.545558173, 98.096586479), (-342.25801959, 374.403422549, 98.096586479))
        Line((-342.25801959, 374.403422549, 98.096586479), (-341.471666924, 374.403422549, 98.096586479))
    # Sketch26 → Sweep1 (sweep)
    with BuildSketch(Plane.XY.offset(30)):
        with Locations((-362.25801959, 208.460025682)):
            Circle(SKETCH26_R)
    sweep(path=sweep1_path.line)

    # Sketch29 → Boss-Extrude13 (add)
    with BuildSketch(Plane(origin=(-341.471666924, 0, 0), x_dir=(0, 0, -1), z_dir=(1, 0, 0))):
        with Locations((-98.096586479, 374.40342255)):
            Rectangle(SKETCH29_W, SKETCH29_H)
    extrude(amount=-BOSS_EXTRUDE13_DEPTH)

    # Chamfer1
    # the kernel refuses this chamfer: 30, 10.919107028 mm, written as the material it takes off along each edge
    with BuildSketch(Plane(origin=(-371.471666924, 286.834290182, 221.297352839), x_dir=(0.9950833631817487, -0.0990409022520507, 0), z_dir=(0, 0, -1))) as chamfer1_piece_1_section:
        Polygon((CHAMFER1_SIZE * 0.99508336318, -CHAMFER1_SIZE * 0.0990409022519), (-CHAMFER1_SIZE_2 * 0.0990409022521, -CHAMFER1_SIZE_2 * 0.995083363182), (0, 0), align=None)
    chamfer1_piece_1 = extrude(amount=168.575690742, mode=Mode.PRIVATE)
    chamfer1_piece_1 = chamfer1_piece_1 - Plane(origin=(-362.25801959, 288.344279988, 98.096586479), x_dir=(1, 0, 0), z_dir=(0, 1, 0)) * Cylinder(8.519654293, 457, mode=Mode.PRIVATE)
    add(chamfer1_piece_1, mode=Mode.SUBTRACT)
    with BuildSketch(Plane(origin=(-371.471666924, 461.972554917, -25.10417988), x_dir=(-0.013184058198646627, -0.9999130865277316, 0), z_dir=(0, 0, 1))) as chamfer1_piece_2:
        Polygon((CHAMFER1_SIZE_2 * 0.999913086528, CHAMFER1_SIZE_2 * 0.0131840581986), (-CHAMFER1_SIZE * 0.0131840581986, CHAMFER1_SIZE * 0.999913086526), (0, 0), align=None)
    extrude(amount=246.401532719, mode=Mode.SUBTRACT)

    # Sketch30 → Cut-Extrude10 (cut)
    with BuildSketch(Plane(origin=(-341.471666924, 0, 0), x_dir=(0, 0, -1), z_dir=(1, 0, 0))):
        with Locations((-98.096586479, 374.40342255)):
            Rectangle(SKETCH30_W, SKETCH30_H)
    extrude(amount=-CUT_EXTRUDE10_DEPTH, mode=Mode.SUBTRACT)

    # Sketch32 → Boss-Extrude14 (add, symmetric)
    with BuildSketch(Plane.XY):
        with BuildLine():
            Line((248.652372784, 94.152555168), (248.652372784, 448.152555168))
            ThreePointArc((248.652372784, 448.152555168), (238.401110125, 472.90129251), (213.652372784, 483.152555168))
            Line((213.652372784, 483.152555168), (-219.539158518, 483.152555168))
            ThreePointArc((-219.539158518, 483.152555168), (-240.314742965, 476.319469996), (-252.978250952, 458.488274648))
            Line((-252.978250952, 458.488274648), (-362.39643277, 104.488274648))
            ThreePointArc((-362.39643277, 104.488274648), (-357.124255163, 73.376970722), (-328.957340336, 59.152555168))
            Line((-328.957340336, 59.152555168), (213.652372784, 59.152555168))
            ThreePointArc((213.652372784, 59.152555168), (238.401110125, 69.403817827), (248.652372784, 94.152555168))
        make_face()
    extrude(amount=BOSS_EXTRUDE14_DEPTH, both=True)


solid = part.part
